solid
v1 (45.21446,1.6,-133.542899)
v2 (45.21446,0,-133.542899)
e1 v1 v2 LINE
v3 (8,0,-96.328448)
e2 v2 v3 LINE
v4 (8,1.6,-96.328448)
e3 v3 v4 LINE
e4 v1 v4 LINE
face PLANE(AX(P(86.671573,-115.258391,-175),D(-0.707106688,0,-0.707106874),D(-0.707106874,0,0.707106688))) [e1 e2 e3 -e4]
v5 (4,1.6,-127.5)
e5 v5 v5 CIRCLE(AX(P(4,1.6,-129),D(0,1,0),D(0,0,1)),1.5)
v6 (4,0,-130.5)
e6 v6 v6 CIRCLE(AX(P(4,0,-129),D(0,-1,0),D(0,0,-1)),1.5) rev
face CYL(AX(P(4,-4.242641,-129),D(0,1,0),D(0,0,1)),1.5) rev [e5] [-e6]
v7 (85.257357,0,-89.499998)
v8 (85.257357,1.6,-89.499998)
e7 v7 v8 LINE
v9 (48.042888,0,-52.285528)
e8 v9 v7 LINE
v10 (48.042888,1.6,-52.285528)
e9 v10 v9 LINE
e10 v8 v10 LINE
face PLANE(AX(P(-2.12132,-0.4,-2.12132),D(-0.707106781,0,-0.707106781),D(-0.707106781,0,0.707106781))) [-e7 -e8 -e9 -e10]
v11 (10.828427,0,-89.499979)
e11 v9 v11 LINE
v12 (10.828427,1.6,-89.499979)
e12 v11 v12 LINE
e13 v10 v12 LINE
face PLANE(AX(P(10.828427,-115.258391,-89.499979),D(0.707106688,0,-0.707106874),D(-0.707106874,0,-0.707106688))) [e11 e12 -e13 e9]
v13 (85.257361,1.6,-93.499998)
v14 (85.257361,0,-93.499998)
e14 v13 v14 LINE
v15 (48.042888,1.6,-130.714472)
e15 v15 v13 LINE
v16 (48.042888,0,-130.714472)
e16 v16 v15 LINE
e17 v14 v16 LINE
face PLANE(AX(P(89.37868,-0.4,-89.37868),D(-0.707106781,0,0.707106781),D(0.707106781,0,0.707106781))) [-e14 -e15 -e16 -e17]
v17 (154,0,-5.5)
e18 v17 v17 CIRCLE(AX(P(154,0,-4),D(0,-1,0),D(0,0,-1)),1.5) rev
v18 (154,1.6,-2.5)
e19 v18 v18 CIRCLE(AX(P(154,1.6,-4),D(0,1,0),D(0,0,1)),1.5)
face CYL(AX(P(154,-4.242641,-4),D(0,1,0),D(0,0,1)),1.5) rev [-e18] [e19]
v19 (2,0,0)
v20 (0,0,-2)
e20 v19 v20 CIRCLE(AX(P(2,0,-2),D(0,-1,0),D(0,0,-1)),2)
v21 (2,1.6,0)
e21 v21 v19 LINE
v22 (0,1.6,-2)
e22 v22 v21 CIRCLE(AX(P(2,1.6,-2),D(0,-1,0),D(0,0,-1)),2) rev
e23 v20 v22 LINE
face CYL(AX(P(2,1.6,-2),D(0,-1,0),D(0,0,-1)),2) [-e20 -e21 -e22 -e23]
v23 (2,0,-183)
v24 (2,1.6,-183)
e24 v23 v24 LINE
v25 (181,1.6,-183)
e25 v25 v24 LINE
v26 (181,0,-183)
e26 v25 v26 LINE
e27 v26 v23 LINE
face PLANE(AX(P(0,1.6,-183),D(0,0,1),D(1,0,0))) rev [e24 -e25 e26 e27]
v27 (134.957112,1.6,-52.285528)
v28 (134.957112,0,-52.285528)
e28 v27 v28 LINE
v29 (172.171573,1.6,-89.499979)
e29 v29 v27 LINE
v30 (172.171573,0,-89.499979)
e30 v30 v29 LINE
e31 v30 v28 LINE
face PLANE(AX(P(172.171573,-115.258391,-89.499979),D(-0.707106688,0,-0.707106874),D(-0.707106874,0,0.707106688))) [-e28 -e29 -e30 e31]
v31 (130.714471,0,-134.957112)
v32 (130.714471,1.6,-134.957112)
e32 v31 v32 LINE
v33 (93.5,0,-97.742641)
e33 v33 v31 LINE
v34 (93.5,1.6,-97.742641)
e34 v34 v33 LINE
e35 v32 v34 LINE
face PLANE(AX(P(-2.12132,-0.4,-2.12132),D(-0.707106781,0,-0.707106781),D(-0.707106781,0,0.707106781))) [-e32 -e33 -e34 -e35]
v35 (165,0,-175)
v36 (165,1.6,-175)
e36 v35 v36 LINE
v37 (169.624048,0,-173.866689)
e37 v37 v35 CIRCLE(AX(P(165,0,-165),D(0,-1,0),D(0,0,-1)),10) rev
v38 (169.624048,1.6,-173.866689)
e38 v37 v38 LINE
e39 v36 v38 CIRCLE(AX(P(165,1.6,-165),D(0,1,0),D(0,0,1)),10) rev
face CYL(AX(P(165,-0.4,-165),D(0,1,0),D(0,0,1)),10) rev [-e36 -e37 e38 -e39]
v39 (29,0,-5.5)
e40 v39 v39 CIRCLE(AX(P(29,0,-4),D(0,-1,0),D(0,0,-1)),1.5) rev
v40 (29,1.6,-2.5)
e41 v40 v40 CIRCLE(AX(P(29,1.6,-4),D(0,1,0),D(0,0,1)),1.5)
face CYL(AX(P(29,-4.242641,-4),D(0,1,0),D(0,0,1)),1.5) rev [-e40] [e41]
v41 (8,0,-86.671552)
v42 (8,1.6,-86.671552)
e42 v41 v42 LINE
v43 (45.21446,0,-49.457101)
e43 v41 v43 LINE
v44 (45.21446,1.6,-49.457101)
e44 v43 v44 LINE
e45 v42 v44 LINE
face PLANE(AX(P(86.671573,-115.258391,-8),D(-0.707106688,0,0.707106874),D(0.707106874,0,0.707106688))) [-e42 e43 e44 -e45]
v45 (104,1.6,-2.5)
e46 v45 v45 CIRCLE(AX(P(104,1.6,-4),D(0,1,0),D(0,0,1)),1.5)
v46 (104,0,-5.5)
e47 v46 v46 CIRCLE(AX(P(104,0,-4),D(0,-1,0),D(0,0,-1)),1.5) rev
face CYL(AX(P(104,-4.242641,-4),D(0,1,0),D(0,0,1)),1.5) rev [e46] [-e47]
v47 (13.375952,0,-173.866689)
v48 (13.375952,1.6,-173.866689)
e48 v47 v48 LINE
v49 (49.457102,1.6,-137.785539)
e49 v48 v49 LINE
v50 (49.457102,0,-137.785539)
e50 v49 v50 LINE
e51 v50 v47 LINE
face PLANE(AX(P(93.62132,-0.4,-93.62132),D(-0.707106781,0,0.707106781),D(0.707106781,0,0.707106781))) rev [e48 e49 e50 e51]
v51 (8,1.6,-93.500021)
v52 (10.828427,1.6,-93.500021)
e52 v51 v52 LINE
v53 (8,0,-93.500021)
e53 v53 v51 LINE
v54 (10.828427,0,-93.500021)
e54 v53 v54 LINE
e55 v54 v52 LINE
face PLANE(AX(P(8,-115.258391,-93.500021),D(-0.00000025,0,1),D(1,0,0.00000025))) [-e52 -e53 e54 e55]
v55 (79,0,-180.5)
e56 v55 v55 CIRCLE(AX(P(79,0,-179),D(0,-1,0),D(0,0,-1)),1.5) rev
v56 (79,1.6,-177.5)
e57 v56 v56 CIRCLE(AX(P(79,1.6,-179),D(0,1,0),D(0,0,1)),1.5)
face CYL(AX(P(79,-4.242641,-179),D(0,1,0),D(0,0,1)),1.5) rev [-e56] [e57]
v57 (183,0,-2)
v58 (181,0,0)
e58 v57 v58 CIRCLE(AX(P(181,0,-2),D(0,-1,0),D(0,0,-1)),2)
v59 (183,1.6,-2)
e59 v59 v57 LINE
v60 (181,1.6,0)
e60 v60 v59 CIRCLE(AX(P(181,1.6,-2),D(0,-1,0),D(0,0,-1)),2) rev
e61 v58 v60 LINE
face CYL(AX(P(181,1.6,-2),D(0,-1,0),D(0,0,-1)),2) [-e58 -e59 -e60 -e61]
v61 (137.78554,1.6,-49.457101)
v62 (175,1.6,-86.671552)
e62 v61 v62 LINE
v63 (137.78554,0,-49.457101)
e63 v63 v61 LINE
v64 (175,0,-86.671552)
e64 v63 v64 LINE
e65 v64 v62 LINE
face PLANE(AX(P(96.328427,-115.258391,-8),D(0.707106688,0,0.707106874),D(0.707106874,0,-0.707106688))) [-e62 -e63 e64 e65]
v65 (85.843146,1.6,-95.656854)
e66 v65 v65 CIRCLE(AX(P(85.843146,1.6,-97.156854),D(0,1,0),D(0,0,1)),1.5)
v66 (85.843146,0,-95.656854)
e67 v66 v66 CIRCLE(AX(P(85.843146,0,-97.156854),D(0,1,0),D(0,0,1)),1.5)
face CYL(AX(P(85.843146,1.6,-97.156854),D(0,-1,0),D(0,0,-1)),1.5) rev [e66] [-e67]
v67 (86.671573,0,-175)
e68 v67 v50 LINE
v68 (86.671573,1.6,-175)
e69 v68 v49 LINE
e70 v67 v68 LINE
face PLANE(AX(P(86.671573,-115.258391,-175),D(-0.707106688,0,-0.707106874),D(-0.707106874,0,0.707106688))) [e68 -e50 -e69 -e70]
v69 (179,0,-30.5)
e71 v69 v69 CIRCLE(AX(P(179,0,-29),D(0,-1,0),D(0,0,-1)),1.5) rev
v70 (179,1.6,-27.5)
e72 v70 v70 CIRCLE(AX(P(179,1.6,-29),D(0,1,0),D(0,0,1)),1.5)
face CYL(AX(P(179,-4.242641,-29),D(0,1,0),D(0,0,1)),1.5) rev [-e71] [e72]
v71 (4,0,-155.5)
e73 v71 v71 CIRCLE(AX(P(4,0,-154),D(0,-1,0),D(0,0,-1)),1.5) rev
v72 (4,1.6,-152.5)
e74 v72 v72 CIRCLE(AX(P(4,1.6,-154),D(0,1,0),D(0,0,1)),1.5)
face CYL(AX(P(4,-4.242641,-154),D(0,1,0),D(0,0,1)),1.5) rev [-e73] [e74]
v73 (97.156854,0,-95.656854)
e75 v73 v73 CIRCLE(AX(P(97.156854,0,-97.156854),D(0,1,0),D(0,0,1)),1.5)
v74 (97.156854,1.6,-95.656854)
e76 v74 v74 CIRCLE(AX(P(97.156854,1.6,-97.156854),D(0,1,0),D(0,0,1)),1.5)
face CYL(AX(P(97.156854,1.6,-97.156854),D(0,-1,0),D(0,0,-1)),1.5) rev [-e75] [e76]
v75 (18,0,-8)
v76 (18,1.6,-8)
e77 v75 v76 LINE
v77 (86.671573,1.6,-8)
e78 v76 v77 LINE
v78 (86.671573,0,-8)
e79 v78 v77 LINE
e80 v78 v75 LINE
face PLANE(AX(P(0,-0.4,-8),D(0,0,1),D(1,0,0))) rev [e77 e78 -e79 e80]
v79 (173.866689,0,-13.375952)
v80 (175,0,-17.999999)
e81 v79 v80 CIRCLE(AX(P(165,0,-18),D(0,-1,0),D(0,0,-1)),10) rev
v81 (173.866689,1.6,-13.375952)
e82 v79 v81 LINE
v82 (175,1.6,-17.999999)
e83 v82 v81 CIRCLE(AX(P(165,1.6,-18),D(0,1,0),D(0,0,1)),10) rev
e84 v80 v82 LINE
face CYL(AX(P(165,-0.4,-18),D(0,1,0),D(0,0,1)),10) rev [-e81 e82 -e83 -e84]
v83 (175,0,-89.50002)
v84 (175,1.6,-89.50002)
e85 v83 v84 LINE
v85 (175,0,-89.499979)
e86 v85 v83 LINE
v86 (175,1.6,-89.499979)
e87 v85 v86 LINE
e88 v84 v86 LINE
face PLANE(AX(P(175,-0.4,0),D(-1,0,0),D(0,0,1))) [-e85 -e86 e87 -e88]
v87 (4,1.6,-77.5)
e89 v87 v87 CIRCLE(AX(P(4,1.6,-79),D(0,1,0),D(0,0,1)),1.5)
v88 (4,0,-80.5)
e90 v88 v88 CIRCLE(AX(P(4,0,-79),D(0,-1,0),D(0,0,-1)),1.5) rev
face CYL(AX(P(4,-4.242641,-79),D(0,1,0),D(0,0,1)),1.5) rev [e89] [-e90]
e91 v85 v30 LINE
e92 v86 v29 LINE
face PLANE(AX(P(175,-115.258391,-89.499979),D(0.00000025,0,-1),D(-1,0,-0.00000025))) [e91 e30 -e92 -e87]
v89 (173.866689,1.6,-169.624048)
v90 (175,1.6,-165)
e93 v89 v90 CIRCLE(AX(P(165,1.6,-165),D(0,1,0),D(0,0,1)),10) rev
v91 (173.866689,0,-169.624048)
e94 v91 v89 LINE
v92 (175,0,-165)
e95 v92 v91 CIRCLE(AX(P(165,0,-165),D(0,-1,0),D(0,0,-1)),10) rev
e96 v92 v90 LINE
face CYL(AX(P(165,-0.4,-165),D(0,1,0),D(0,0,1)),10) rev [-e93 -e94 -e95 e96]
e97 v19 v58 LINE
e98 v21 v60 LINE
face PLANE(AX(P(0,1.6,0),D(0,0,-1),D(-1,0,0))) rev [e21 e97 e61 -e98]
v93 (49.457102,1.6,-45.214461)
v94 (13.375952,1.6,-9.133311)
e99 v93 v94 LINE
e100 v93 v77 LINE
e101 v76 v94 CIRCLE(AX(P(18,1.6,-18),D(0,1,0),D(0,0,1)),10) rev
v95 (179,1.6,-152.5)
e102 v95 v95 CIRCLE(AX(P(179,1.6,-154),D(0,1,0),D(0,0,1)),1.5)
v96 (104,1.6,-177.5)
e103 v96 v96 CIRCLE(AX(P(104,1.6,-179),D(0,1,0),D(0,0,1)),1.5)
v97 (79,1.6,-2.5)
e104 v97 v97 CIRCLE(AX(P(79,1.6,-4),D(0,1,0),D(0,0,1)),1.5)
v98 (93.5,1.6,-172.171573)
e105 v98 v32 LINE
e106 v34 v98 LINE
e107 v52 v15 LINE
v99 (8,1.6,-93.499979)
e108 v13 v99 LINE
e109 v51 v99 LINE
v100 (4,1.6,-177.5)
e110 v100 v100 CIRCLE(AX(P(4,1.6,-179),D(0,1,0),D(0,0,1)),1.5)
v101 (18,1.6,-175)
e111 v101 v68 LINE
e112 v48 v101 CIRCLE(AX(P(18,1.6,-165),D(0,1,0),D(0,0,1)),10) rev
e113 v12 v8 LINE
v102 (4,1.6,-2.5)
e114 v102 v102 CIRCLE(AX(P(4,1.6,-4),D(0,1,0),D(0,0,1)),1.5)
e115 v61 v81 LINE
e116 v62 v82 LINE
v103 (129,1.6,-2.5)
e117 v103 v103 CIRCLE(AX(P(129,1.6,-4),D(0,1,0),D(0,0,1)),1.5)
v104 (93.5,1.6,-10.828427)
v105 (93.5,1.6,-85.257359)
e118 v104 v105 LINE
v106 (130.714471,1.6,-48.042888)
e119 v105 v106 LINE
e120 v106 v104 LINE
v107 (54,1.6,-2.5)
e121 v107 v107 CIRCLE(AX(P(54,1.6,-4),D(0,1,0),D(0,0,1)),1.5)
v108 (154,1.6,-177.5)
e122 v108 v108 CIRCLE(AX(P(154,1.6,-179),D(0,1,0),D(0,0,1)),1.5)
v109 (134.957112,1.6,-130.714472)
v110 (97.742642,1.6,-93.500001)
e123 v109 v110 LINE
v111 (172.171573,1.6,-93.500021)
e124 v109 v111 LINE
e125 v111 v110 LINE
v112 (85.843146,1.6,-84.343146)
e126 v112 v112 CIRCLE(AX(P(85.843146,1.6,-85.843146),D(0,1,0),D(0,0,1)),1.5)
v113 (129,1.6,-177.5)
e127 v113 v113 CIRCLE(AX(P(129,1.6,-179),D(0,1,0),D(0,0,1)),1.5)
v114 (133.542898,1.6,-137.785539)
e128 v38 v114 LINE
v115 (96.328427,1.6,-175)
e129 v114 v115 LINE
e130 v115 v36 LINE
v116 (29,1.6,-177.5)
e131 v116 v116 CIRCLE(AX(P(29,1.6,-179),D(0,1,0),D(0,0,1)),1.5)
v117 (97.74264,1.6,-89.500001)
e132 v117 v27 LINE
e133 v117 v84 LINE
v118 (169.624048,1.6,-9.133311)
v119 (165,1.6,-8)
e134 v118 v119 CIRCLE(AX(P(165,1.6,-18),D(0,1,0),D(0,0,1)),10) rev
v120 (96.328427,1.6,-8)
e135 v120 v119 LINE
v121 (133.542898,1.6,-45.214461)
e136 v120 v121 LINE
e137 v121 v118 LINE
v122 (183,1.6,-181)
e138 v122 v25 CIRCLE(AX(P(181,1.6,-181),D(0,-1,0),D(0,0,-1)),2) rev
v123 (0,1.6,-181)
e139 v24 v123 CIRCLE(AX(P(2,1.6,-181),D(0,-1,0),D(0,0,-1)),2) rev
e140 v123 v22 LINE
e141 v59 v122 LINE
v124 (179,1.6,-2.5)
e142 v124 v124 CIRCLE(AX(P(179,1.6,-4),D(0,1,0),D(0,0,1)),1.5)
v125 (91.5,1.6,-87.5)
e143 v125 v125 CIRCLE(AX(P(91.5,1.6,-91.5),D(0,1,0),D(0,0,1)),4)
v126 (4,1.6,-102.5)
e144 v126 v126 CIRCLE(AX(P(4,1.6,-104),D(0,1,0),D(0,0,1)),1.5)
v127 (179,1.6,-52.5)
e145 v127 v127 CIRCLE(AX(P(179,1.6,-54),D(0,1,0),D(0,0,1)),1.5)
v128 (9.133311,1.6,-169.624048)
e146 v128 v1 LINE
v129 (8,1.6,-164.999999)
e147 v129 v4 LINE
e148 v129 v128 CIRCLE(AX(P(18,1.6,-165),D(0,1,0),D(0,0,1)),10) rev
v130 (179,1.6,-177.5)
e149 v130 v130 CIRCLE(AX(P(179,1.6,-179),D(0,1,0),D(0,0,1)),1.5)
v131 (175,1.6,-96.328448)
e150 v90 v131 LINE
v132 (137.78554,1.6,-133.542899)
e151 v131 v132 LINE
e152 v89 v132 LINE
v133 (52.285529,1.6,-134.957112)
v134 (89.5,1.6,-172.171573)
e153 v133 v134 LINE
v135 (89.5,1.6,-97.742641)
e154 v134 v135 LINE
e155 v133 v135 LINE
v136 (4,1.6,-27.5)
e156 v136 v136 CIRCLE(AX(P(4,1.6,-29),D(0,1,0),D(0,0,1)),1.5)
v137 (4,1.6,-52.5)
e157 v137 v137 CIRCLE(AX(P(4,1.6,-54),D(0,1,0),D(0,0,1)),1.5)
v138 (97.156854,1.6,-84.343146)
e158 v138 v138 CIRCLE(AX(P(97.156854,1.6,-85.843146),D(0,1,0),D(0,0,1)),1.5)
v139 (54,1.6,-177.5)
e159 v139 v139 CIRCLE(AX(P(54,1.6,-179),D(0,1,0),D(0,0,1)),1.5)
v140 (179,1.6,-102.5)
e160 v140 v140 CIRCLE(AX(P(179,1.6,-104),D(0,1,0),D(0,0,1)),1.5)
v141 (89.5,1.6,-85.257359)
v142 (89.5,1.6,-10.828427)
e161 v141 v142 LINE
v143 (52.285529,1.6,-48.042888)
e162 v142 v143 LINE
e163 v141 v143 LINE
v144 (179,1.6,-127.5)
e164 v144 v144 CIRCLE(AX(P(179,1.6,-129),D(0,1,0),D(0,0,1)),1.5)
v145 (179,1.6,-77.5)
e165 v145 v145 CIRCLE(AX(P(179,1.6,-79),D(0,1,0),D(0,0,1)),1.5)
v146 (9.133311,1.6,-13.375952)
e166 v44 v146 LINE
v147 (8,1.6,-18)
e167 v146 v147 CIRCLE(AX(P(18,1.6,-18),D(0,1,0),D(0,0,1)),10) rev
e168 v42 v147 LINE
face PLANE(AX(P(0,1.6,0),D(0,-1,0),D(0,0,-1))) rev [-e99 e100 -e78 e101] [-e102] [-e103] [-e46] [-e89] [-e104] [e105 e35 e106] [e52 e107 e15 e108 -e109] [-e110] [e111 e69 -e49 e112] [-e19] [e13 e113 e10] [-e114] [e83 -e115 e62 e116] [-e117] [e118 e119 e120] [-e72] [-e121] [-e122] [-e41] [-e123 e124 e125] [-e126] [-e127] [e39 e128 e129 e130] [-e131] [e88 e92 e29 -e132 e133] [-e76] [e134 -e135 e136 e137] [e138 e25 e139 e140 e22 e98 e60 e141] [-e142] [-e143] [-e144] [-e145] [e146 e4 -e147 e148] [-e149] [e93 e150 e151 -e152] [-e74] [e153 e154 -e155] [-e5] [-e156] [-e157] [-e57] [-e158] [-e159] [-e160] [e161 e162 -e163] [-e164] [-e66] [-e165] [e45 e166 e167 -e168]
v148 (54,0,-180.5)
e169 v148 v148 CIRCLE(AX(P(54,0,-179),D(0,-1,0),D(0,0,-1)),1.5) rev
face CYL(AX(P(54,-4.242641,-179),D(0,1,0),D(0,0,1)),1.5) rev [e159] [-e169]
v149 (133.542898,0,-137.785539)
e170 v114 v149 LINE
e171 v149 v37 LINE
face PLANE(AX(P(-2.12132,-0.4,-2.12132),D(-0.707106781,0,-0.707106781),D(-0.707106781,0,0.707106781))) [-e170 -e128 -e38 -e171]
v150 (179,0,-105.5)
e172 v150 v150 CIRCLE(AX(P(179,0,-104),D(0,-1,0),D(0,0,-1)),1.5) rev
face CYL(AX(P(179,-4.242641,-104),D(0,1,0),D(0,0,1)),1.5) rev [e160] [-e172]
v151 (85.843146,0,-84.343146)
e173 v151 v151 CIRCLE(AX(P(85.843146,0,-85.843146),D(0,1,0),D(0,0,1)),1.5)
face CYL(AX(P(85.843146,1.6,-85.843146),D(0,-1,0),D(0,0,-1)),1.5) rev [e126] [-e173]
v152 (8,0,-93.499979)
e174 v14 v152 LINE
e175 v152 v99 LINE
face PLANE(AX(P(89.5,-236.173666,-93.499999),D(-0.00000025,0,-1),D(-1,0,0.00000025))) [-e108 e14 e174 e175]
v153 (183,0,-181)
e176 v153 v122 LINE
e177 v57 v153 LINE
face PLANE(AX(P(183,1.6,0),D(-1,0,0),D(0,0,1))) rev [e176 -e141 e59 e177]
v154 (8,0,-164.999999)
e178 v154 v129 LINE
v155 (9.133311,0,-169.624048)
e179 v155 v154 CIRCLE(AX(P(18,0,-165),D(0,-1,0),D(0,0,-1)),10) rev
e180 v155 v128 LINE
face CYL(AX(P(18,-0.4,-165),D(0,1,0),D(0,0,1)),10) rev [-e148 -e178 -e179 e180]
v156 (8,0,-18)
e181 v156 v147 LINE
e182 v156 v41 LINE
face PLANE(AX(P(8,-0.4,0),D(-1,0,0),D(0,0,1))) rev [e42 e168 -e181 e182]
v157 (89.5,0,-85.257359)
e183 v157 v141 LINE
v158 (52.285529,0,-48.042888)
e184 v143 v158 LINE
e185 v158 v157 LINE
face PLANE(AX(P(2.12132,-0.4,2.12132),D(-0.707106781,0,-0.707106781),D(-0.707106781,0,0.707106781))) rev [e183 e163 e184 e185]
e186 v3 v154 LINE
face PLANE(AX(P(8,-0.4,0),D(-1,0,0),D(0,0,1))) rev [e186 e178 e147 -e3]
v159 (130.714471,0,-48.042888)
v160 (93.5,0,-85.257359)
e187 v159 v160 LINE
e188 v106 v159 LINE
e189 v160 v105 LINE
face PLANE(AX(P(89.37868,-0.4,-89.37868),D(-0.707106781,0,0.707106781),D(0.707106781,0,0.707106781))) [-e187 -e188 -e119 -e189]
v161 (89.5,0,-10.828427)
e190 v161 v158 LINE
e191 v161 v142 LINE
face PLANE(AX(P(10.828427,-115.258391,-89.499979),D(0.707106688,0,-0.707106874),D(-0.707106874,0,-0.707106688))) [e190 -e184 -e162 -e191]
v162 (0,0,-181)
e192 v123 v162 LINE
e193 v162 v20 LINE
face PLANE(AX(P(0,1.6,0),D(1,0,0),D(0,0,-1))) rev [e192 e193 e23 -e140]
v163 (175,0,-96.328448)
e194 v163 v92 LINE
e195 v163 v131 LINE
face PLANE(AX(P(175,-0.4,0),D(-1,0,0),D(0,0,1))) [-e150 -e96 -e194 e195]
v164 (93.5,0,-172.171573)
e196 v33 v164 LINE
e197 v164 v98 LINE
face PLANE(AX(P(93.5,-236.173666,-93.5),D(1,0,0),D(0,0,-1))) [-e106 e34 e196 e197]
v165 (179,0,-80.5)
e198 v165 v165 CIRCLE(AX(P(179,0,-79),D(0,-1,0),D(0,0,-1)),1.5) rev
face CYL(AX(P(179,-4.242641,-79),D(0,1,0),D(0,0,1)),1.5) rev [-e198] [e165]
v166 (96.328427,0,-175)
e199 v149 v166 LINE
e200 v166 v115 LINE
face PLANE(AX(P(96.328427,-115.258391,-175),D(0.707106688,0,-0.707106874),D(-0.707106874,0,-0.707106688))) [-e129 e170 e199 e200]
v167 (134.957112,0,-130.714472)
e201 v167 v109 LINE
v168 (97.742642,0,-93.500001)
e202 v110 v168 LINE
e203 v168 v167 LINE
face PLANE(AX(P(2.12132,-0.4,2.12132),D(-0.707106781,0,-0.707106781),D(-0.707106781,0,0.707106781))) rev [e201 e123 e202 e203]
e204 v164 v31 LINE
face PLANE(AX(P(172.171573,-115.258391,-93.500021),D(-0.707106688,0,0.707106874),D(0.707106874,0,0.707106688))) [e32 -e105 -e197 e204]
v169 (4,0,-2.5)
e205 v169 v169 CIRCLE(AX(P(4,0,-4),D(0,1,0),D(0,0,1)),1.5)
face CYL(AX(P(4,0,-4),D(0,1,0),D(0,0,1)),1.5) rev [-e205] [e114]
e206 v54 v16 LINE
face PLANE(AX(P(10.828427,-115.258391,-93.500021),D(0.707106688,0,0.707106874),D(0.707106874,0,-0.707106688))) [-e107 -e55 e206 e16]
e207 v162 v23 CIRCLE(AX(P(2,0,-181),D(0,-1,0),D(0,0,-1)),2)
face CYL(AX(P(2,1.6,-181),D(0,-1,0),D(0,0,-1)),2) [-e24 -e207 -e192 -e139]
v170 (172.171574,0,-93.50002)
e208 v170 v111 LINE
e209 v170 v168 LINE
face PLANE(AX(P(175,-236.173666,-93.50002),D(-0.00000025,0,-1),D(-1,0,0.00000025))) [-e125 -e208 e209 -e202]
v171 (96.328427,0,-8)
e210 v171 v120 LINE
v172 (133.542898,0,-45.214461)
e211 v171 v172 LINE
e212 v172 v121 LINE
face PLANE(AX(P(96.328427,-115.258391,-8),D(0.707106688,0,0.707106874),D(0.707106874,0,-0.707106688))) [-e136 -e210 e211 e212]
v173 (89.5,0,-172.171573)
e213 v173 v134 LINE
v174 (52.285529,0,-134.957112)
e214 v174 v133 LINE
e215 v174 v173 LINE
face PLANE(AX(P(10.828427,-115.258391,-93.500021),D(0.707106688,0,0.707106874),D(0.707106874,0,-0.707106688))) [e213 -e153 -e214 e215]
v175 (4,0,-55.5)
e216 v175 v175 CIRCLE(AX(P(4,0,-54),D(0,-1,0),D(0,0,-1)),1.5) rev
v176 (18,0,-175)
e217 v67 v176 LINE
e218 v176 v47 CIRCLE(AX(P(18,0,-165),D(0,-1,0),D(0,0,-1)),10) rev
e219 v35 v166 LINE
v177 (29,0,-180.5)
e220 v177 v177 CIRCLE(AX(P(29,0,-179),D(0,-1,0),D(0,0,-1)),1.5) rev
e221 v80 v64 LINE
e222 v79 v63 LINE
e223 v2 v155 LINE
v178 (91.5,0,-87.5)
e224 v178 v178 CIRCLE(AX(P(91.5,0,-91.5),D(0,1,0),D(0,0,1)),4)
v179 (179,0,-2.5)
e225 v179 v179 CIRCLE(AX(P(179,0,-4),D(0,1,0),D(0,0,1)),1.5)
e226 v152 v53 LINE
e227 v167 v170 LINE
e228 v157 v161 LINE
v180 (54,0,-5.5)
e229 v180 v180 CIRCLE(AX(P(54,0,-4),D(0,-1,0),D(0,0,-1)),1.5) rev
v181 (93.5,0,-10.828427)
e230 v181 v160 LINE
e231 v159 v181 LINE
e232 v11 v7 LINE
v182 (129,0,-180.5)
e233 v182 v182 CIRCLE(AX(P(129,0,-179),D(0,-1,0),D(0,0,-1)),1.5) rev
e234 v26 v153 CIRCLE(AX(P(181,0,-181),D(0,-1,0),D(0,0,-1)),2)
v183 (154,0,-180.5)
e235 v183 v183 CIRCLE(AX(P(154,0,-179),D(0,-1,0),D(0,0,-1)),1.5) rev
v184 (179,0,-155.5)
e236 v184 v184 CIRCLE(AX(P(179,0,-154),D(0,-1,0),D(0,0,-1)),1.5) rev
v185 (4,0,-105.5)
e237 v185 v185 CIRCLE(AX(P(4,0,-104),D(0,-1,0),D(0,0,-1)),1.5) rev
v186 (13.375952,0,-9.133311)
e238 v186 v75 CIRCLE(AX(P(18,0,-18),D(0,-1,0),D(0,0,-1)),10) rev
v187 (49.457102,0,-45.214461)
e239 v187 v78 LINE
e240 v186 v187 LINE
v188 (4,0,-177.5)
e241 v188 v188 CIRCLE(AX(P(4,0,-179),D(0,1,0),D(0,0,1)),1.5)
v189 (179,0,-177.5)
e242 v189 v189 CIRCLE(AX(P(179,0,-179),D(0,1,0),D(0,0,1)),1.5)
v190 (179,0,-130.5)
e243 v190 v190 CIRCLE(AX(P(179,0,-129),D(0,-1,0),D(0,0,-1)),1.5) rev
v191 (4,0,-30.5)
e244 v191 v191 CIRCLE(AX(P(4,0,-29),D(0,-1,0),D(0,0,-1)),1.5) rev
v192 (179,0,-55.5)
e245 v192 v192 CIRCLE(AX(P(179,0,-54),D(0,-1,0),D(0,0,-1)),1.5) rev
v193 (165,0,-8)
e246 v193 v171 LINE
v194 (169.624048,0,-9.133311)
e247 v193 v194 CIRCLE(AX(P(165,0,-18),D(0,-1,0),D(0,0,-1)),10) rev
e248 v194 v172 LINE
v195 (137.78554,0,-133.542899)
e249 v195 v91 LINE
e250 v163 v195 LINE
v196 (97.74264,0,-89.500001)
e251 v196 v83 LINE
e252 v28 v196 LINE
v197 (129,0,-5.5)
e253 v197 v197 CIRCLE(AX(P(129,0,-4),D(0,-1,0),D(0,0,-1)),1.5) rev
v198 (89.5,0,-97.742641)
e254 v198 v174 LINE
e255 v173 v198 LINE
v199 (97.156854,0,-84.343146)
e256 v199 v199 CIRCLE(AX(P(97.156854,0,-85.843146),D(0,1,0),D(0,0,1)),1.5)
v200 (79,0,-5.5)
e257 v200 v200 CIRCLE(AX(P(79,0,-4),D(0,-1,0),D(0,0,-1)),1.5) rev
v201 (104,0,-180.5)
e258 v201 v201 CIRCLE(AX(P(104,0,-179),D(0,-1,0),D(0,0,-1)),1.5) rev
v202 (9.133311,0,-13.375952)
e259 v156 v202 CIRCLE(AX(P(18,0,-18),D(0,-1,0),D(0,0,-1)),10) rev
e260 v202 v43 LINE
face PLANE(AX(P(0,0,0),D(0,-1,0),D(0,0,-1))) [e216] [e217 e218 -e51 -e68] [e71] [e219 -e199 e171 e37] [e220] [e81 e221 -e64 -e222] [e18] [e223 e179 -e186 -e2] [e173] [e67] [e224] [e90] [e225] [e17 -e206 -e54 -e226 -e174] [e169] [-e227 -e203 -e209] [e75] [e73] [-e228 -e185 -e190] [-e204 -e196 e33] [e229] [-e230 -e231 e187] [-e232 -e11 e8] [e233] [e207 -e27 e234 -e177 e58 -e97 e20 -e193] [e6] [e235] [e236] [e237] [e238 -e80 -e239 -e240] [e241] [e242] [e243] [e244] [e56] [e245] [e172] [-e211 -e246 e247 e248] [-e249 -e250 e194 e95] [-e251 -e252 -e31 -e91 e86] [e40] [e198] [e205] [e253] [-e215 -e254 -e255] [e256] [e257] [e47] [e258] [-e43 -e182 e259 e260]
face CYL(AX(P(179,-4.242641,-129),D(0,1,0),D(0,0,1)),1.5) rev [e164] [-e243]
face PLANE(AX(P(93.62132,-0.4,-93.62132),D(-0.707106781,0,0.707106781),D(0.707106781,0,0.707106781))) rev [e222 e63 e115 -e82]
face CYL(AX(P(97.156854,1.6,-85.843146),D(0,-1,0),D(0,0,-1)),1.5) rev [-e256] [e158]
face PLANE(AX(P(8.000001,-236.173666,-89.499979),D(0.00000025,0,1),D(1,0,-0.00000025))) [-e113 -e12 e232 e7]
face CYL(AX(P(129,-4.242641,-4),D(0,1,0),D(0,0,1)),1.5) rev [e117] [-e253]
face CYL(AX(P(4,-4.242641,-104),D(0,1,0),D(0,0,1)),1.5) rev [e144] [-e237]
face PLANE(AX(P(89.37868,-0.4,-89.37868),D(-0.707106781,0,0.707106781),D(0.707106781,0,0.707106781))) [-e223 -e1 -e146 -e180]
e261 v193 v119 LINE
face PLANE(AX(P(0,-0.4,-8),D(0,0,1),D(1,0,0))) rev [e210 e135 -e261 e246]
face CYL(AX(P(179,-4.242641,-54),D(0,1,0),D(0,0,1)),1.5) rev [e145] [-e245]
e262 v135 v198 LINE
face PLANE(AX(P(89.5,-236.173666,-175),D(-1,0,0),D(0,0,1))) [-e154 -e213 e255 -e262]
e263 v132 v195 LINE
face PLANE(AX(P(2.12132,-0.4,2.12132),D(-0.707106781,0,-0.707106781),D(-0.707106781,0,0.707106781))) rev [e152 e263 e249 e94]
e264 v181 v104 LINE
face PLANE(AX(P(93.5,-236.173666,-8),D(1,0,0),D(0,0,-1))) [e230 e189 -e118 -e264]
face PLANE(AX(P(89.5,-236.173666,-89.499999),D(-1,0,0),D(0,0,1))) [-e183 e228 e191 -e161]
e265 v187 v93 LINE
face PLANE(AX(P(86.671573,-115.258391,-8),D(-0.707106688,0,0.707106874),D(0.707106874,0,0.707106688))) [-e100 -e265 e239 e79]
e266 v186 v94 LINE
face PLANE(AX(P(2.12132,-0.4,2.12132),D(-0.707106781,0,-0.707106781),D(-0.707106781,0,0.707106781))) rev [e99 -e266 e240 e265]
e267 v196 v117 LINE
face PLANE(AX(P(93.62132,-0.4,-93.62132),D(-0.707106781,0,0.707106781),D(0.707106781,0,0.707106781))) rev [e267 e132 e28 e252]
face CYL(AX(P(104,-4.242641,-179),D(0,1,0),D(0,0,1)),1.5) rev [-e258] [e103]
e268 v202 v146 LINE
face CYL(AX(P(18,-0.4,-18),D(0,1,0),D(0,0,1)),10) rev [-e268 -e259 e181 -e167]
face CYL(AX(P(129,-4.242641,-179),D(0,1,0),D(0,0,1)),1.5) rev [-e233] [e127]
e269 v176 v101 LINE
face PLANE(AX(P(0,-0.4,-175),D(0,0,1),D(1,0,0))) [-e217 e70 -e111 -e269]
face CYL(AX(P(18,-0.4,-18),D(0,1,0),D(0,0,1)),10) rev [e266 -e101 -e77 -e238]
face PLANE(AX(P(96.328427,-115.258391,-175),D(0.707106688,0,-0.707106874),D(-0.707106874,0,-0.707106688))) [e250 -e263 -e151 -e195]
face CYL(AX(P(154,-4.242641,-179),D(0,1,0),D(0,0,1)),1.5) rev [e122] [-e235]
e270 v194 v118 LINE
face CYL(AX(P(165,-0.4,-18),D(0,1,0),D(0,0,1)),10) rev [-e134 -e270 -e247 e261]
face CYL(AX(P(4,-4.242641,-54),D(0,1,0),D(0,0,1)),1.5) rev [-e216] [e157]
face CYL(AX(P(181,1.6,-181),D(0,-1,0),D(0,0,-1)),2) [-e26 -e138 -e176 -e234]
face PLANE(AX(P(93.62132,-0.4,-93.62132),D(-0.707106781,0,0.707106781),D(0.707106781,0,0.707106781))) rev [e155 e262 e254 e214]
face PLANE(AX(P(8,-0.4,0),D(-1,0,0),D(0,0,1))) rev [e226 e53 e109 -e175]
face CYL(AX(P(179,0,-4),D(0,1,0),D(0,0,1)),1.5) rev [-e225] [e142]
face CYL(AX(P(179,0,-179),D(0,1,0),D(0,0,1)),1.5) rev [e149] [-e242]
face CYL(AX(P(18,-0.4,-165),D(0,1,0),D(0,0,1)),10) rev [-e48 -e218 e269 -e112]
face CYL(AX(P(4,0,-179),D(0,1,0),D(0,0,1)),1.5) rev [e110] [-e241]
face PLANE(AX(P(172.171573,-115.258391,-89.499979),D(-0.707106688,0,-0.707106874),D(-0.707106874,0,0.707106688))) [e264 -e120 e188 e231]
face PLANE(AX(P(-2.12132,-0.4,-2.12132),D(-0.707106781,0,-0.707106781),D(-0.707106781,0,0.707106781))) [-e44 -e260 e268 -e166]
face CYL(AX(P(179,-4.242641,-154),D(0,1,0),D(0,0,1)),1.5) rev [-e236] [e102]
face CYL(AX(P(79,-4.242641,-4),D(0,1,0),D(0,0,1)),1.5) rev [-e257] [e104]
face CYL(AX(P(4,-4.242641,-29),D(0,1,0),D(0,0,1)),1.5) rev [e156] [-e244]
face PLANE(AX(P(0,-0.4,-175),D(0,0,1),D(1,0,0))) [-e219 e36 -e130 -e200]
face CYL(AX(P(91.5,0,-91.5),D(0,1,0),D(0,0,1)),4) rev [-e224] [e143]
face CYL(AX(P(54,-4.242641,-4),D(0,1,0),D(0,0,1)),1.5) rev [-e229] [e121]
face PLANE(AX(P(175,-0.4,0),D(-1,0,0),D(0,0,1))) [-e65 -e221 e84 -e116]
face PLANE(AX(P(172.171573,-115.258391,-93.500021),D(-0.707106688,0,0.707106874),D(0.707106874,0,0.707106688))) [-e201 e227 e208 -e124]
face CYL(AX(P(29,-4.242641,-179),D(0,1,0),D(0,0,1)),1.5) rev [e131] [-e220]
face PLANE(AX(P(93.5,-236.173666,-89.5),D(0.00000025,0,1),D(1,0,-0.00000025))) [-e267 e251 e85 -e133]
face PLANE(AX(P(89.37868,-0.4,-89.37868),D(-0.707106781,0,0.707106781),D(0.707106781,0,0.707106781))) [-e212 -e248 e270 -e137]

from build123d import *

# Parameters (mm, degrees)
SKETCH1_W           = 183
SKETCH1_H           = 183
SKETCH1_R           = 1.5
BOSS_EXTRUDE1_DEPTH = 1.6
CUT_EXTRUDE1_DEPTH  = 2
FILLET1_R           = 2
SKETCH3_R           = 1.5
CUT_EXTRUDE2_DEPTH  = 259.806027751
BOSS_EXTRUDE2_DEPTH = 1.6
SKETCH8_R           = 4
CUT_EXTRUDE4_DEPTH  = 259.806027751
BOSS_EXTRUDE4_DEPTH = 1.6
SKETCH7_R           = 1.5
CUT_EXTRUDE3_DEPTH  = 1.6


with BuildPart() as part:
    # Sketch1 → Boss-Extrude1 (new body)
    with BuildSketch(Plane(origin=(0, 0, 0), x_dir=(1, 0, 0), z_dir=(0, 1, 0))):
        with Locations((91.5, 91.5)):
            Rectangle(SKETCH1_W, SKETCH1_H)
        with Locations(Location((85.843145751, 97.156854249, 0), (0, 0, 270))):
            Circle(SKETCH1_R, mode=Mode.SUBTRACT)
        with Locations(Location((97.156854249, 97.156854249, 0), (0, 0, 270))):
            Circle(SKETCH1_R, mode=Mode.SUBTRACT)
        with Locations(Location((97.156854249, 85.843145751, 0), (0, 0, 270))):
            Circle(SKETCH1_R, mode=Mode.SUBTRACT)
        with Locations(Location((85.843145751, 85.843145751, 0), (0, 0, 270))):
            Circle(SKETCH1_R, mode=Mode.SUBTRACT)
    extrude(amount=BOSS_EXTRUDE1_DEPTH)

    # Sketch2 → Cut-Extrude1 (cut)
    with BuildSketch(Plane(origin=(0, 1.6, 0), x_dir=(1, 0, 0), z_dir=(0, 1, 0))):
        with BuildLine():
            ThreePointArc((18, 175), (15.619547443, 174.712540637), (13.375951562, 173.866689125))
            Line((13.375951562, 173.866689125), (91.5, 95.742640687))
            Line((91.5, 95.742640687), (169.624048438, 173.866689125))
            ThreePointArc((169.624048438, 173.866689125), (167.380452557, 174.712540637), (165, 175))
            Line((165, 175), (18, 175))
        make_face()
        with BuildLine():
            Line((87.257359313, 91.5), (9.133310875, 169.624048438))
            ThreePointArc((9.133310875, 169.624048438), (8.287459244, 167.38045207), (8, 164.999998998))
            Line((8, 164.999998998), (8, 18))
            ThreePointArc((8, 18), (8.287459363, 15.619547443), (9.133310875, 13.375951562))
            Line((9.133310875, 13.375951562), (87.257359313, 91.5))
        make_face()
        with BuildLine():
            Line((169.624048438, 9.133310875), (91.5, 87.257359313))
            Line((91.5, 87.257359313), (13.375951562, 9.133310875))
            ThreePointArc((13.375951562, 9.133310875), (15.619547443, 8.287459363), (18, 8))
            Line((18, 8), (165, 8))
            ThreePointArc((165, 8), (167.380452557, 8.287459363), (169.624048438, 9.133310875))
        make_face()
        with BuildLine():
            Line((173.866689125, 169.624048438), (95.742640687, 91.5))
            Line((95.742640687, 91.5), (173.866689125, 13.375951562))
            ThreePointArc((173.866689125, 13.375951562), (174.712540518, 15.619546957), (175, 17.999998998))
            Line((175, 17.999998998), (175, 165))
            ThreePointArc((175, 165), (174.712540637, 167.380452557), (173.866689125, 169.624048438))
        make_face()
    extrude(amount=-CUT_EXTRUDE1_DEPTH, mode=Mode.SUBTRACT)

    # Fillet1
    fillet1_edges = [part.edges().sort_by_distance(p)[0] for p in [
        (0, 0.8, -183),
        (183, 0.8, -183),
        (183, 0.8, 0),
        (0, 0.8, 0),
    ]]
    fillet(fillet1_edges, radius=FILLET1_R)

    # Sketch3 → Cut-Extrude2 (cut, through all)
    with BuildSketch(Plane(origin=(0, 1.6, 0), x_dir=(1, 0, 0), z_dir=(0, 1, 0))):
        with Locations(Location((4, 179, 0), (0, 0, 270))):
            Circle(SKETCH3_R)
        with Locations(Location((179, 179, 0), (0, 0, 270))):
            Circle(SKETCH3_R)
        with Locations(Location((179, 4, 0), (0, 0, 270))):
            Circle(SKETCH3_R)
        with Locations(Location((4, 4, 0), (0, 0, 270))):
            Circle(SKETCH3_R)
    extrude(amount=-CUT_EXTRUDE2_DEPTH, mode=Mode.SUBTRACT)


with BuildPart() as boss_extrude2_tool:
    # Sketch4 → Boss-Extrude2 (new body)
    with BuildSketch(Plane(origin=(0, 1.6, 0), x_dir=(1, 0, 0), z_dir=(0, 1, 0))):
        Polygon((93.5, 89.5), (175.000001002, 89.500020414), (175, 93.500020414), (93.5, 93.5), (93.5, 175), (89.5, 175), (89.5, 93.499998998), (8, 93.499978584), (8.000001002, 89.499978584), (89.5, 89.499998998), (89.5, 8), (93.5, 8), align=None)
    extrude(amount=-BOSS_EXTRUDE2_DEPTH)


with BuildPart() as part_1:
    add(part.part)


with BuildPart() as part_2:
    # Boss-Extrude2: joined with boss_extrude2_tool
    add(part_1.part.fuse(boss_extrude2_tool.part, tol=0.00001))

    # Sketch8 → Cut-Extrude4 (cut, through all)
    with BuildSketch(Plane(origin=(0, 1.6, 0), x_dir=(1, 0, 0), z_dir=(0, 1, 0))):
        with Locations(Location((91.5, 91.5, 0), (0, 0, 270))):
            Circle(SKETCH8_R)
    extrude(amount=-CUT_EXTRUDE4_DEPTH, mode=Mode.SUBTRACT)


with BuildPart() as boss_extrude4_tool:
    # Sketch6 → Boss-Extrude4 (new body)
    with BuildSketch(Plane(origin=(0, 1.6, 0), x_dir=(1, 0, 0), z_dir=(0, 1, 0))):
        Polygon((10.828426788, 89.499979292), (89.5, 10.828426753), (89.5, 8), (86.671572504, 8), (8, 86.671551831), (8, 89.499978584), align=None)
        Polygon((8, 93.500021416), (10.828426788, 93.500020708), (89.5, 172.171573247), (89.5, 175), (86.671572504, 175), (8, 96.328448169), align=None)
        Polygon((172.171573212, 93.500020708), (93.5, 172.171573247), (93.5, 175), (96.328427496, 175), (175, 96.328448169), (175, 93.500021416), align=None)
        Polygon((175, 89.499978584), (172.171573212, 89.499979292), (93.5, 10.828426753), (93.5, 8), (96.328427496, 8), (175, 86.671551831), align=None)
    extrude(amount=-BOSS_EXTRUDE4_DEPTH)


with BuildPart() as part_3:
    add(part_2.part)


with BuildPart() as part_4:
    # Boss-Extrude4: joined with boss_extrude4_tool
    add(part_3.part.fuse(boss_extrude4_tool.part, tol=0.00001))

    # Sketch7 → Cut-Extrude3 (cut)
    with BuildSketch(Plane(origin=(0, 1.6, 0), x_dir=(1, 0, 0), z_dir=(0, 1, 0))):
        with Locations(Location((29, 179, 0), (0, 0, 270))):
            Circle(SKETCH7_R)
        with Locations(Location((4, 29, 0), (0, 0, 270))):
            Circle(SKETCH7_R)
        with Locations(Location((4, 54, 0), (0, 0, 270))):
            Circle(SKETCH7_R)
        with Locations(Location((4, 79, 0), (0, 0, 270))):
            Circle(SKETCH7_R)
        with Locations(Location((4, 104, 0), (0, 0, 270))):
            Circle(SKETCH7_R)
        with Locations(Location((4, 129, 0), (0, 0, 270))):
            Circle(SKETCH7_R)
        with Locations(Location((4, 154, 0), (0, 0, 270))):
            Circle(SKETCH7_R)
        with Locations(Location((54, 179, 0), (0, 0, 270))):
            Circle(SKETCH7_R)
        with Locations(Location((79, 179, 0), (0, 0, 270))):
            Circle(SKETCH7_R)
        with Locations(Location((104, 179, 0), (0, 0, 270))):
            Circle(SKETCH7_R)
        with Locations(Location((129, 179, 0), (0, 0, 270))):
            Circle(SKETCH7_R)
        with Locations(Location((154, 179, 0), (0, 0, 270))):
            Circle(SKETCH7_R)
        with Locations(Location((179, 154, 0), (0, 0, 270))):
            Circle(SKETCH7_R)
        with Locations(Location((179, 129, 0), (0, 0, 270))):
            Circle(SKETCH7_R)
        with Locations(Location((179, 104, 0), (0, 0, 270))):
            Circle(SKETCH7_R)
        with Locations(Location((179, 79, 0), (0, 0, 270))):
            Circle(SKETCH7_R)
        with Locations(Location((179, 54, 0), (0, 0, 270))):
            Circle(SKETCH7_R)
        with Locations(Location((179, 29, 0), (0, 0, 270))):
            Circle(SKETCH7_R)
        with Locations(Location((154, 4, 0), (0, 0, 270))):
            Circle(SKETCH7_R)
        with Locations(Location((129, 4, 0), (0, 0, 270))):
            Circle(SKETCH7_R)
        with Locations(Location((104, 4, 0), (0, 0, 270))):
            Circle(SKETCH7_R)
        with Locations(Location((79, 4, 0), (0, 0, 270))):
            Circle(SKETCH7_R)
        with Locations(Location((54, 4, 0), (0, 0, 270))):
            Circle(SKETCH7_R)
        with Locations(Location((29, 4, 0), (0, 0, 270))):
            Circle(SKETCH7_R)
    extrude(amount=-CUT_EXTRUDE3_DEPTH, mode=Mode.SUBTRACT)


solid = part_4.part
